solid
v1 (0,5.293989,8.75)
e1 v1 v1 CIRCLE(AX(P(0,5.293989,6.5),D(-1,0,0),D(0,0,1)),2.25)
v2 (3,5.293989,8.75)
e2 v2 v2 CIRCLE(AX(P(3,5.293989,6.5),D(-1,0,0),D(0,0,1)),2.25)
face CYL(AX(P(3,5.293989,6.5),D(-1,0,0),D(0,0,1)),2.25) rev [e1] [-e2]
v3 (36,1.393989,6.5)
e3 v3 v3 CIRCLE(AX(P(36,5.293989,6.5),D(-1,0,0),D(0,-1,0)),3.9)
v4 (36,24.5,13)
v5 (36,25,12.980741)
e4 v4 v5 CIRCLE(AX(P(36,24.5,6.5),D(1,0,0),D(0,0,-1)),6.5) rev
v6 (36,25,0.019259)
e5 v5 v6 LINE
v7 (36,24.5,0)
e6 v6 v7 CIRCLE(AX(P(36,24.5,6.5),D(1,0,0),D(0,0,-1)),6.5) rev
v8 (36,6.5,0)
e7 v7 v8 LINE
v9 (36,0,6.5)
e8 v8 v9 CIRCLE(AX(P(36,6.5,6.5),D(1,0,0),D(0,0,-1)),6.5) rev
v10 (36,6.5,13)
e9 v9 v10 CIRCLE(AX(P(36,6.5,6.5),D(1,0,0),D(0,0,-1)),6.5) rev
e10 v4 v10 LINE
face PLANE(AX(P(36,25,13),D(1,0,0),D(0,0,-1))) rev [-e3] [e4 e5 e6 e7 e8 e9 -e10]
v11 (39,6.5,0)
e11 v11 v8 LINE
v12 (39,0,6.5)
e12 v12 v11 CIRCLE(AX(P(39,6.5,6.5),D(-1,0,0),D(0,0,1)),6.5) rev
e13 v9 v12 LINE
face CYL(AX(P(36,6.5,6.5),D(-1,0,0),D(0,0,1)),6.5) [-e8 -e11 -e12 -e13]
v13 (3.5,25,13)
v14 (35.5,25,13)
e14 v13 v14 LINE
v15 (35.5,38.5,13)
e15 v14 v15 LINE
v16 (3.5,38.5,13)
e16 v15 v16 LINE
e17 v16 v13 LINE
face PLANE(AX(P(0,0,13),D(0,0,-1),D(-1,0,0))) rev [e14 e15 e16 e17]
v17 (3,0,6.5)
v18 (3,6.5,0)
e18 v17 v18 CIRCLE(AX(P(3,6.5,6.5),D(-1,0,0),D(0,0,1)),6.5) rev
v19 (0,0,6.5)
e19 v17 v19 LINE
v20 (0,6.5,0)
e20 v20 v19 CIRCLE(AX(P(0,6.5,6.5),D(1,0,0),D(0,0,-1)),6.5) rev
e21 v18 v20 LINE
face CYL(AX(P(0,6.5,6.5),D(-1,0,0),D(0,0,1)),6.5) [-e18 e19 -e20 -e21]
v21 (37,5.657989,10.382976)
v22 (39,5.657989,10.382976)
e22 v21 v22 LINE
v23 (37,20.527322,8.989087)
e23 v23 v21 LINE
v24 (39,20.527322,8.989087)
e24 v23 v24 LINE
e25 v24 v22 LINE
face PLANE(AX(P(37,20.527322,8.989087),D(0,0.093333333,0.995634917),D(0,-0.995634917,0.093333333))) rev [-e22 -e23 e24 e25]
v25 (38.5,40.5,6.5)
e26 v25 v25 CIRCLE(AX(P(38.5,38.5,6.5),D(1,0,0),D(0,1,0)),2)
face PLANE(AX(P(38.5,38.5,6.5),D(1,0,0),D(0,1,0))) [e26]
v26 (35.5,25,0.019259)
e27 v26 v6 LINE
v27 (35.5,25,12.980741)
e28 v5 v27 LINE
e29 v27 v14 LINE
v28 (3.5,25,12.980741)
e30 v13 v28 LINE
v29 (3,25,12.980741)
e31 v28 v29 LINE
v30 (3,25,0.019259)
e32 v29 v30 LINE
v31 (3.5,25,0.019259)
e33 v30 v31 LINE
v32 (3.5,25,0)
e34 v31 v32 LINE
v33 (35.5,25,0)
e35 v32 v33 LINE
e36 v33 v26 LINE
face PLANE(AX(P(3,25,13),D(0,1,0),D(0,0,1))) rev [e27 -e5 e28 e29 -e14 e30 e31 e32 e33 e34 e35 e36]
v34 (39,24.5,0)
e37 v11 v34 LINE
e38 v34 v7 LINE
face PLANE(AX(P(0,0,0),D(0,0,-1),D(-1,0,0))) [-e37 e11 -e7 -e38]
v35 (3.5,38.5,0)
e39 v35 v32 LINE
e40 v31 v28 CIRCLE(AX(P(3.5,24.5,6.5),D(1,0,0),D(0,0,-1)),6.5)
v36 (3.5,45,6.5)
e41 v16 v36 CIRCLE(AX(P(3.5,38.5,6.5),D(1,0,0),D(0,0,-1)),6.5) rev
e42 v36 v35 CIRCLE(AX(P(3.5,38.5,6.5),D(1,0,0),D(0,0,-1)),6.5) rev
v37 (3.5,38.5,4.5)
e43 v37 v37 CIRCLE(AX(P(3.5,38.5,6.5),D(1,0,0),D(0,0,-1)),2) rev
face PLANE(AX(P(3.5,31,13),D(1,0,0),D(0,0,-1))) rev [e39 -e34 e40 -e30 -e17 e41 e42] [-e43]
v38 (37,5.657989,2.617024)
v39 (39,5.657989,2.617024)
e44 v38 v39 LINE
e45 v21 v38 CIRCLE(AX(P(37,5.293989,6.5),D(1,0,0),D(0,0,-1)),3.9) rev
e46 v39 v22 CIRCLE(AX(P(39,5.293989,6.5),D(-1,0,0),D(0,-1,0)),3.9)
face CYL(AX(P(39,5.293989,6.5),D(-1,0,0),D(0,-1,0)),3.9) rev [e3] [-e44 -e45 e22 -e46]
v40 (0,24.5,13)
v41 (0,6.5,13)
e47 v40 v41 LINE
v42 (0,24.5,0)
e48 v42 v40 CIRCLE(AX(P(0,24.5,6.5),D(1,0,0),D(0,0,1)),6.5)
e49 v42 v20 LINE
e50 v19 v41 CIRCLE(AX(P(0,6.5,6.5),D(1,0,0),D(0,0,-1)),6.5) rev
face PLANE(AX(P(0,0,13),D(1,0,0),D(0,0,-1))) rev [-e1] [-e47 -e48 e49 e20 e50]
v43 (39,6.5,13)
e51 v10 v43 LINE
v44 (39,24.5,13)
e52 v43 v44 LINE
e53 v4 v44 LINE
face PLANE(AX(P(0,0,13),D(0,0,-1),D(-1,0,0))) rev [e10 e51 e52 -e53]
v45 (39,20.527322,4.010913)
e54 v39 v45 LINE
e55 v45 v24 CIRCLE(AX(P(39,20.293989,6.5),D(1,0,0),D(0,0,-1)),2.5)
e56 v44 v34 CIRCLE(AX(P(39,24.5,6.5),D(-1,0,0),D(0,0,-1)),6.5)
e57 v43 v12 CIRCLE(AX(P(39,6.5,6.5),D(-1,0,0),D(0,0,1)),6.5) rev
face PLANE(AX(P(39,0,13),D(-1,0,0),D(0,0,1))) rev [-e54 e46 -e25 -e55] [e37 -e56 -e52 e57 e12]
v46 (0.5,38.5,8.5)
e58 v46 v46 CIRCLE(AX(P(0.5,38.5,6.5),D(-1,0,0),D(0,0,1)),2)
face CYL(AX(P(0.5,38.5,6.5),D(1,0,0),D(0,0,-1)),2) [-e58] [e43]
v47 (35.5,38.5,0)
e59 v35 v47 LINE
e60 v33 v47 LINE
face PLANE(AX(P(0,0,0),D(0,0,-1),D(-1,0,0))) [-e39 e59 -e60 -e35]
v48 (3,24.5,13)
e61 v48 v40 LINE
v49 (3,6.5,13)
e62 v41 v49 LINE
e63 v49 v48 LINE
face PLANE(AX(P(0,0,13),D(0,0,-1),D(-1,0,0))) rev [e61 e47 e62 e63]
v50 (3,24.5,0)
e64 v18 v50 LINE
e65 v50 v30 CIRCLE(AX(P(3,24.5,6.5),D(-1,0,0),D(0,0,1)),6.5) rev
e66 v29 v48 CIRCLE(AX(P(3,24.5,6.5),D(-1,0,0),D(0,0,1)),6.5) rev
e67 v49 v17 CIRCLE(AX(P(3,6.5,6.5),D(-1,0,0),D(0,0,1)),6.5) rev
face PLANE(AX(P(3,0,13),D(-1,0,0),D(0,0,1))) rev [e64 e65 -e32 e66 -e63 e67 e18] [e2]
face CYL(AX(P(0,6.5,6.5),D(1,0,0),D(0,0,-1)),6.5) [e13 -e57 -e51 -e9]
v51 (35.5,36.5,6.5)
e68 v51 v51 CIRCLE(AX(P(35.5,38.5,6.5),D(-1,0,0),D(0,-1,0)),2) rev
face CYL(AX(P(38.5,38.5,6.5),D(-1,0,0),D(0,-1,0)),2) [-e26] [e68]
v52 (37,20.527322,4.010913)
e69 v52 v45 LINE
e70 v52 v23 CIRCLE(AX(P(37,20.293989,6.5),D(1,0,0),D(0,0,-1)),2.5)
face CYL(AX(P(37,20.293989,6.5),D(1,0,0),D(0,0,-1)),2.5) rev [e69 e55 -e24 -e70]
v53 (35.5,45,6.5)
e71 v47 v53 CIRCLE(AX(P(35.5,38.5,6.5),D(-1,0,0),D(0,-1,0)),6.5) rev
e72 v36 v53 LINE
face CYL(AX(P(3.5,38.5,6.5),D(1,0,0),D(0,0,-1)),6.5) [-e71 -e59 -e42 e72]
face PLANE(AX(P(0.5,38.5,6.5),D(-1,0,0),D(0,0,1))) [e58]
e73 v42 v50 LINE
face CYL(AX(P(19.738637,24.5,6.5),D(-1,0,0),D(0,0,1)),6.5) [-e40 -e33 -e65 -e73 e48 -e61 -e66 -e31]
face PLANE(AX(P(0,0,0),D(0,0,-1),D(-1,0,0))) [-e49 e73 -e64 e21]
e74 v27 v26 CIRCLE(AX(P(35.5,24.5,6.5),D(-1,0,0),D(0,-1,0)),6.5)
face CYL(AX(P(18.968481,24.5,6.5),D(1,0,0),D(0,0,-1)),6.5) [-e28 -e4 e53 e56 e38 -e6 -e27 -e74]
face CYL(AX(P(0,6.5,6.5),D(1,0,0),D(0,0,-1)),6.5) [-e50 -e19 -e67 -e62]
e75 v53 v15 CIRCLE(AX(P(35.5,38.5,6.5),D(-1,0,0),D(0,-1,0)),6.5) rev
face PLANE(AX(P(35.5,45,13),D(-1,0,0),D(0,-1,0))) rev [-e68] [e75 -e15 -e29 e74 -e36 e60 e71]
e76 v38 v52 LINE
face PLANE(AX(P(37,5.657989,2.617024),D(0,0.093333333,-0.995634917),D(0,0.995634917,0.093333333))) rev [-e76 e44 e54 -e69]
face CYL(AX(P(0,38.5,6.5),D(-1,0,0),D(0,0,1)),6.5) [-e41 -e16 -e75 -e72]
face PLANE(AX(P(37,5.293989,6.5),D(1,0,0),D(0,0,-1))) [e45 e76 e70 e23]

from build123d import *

# Parameters (mm, degrees)
BOSS_EXTRUDE1_DEPTH = 13
SKETCH2_R           = 2.25
CUT_EXTRUDE1_DEPTH  = 3
SKETCH3_R           = 2
BOSS_EXTRUDE3_DEPTH = 3
BOSS_EXTRUDE4_START = 3
SKETCH4_R           = 2
BOSS_EXTRUDE4_DEPTH = 3
CUT_EXTRUDE2_DEPTH  = 3.5
CUT_EXTRUDE3_START  = -3.5
CUT_EXTRUDE3_DEPTH  = 3.5
FILLET1_R           = 6.5
SKETCH7_R           = 3.9
CUT_EXTRUDE4_DEPTH  = 60.076221951
CUT_EXTRUDE5_START  = -2
CUT_EXTRUDE5_DEPTH  = 2


with BuildPart() as part:
    # Sketch1 → Boss-Extrude1 (new body)
    with BuildSketch(Plane.XY):
        Polygon((3, 0), (3, 25), (36, 25), (36, 0), (39, 0), (39, 31), (35.5, 31), (35.5, 45), (3.5, 45), (3.5, 31), (0, 31), (0, 0), align=None)
    extrude(amount=BOSS_EXTRUDE1_DEPTH)

    # Sketch2 → Cut-Extrude1 (cut)
    with BuildSketch(Plane.ZY):
        with Locations((6.5, 5.293988539)):
            Circle(SKETCH2_R)
    extrude(amount=-CUT_EXTRUDE1_DEPTH, mode=Mode.SUBTRACT)

    # Sketch3 → Boss-Extrude3 (add)
    with BuildSketch(Plane.ZY.offset(-3.5)):
        with Locations(Location((6.5, 38.5, 0), (0, 0, 180))):
            Circle(SKETCH3_R)
    extrude(amount=BOSS_EXTRUDE3_DEPTH)

    # Sketch4 → Boss-Extrude4 (add)
    with BuildSketch(Plane(origin=(35.5, 0, 0), x_dir=(0, 0, -1), z_dir=(1, 0, 0)).offset(BOSS_EXTRUDE4_START)):
        with Locations((-6.5, 38.5)):
            Circle(SKETCH4_R)
    extrude(amount=-BOSS_EXTRUDE4_DEPTH)

    # Sketch5 → Cut-Extrude2 (cut)
    with BuildSketch(Plane.ZY):
        with BuildLine():
            Line((0, 24.5), (0, 34.231050233))
            Line((0, 34.231050233), (13, 34.231050233))
            Line((13, 34.231050233), (13, 24.5))
            ThreePointArc((13, 24.5), (6.5, 31), (0, 24.5))
        make_face()
    extrude(amount=-CUT_EXTRUDE2_DEPTH, mode=Mode.SUBTRACT)

    # Sketch6 → Cut-Extrude3 (cut)
    with BuildSketch(Plane(origin=(39, 0, 0), x_dir=(0, 0, -1), z_dir=(1, 0, 0)).offset(CUT_EXTRUDE3_START)):
        with BuildLine():
            Line((-13, 24.5), (-13, 34.712302794))
            Line((-13, 34.712302794), (0, 34.712302794))
            Line((0, 34.712302794), (0, 24.5))
            ThreePointArc((0, 24.5), (-6.5, 31), (-13, 24.5))
        make_face()
    extrude(amount=CUT_EXTRUDE3_DEPTH, mode=Mode.SUBTRACT)

    # Fillet1
    fillet1_edges = [part.edges().sort_by_distance(p)[0] for p in [
        (37.5, 0, 13),
        (37.5, 0, 0),
        (1.5, 0, 0),
        (1.5, 0, 13),
        (19.5, 45, 0),
        (19.5, 45, 13),
    ]]
    fillet(fillet1_edges, radius=FILLET1_R - 0.0001)  # a hair under: the kernel refuses the full size

    # Sketch7 → Cut-Extrude4 (cut, through all)
    with BuildSketch(Plane.ZY.offset(-36)):
        with Locations(Location((6.5, 5.293988539, 0), (0, 0, 270))):
            Circle(SKETCH7_R)
    extrude(amount=-CUT_EXTRUDE4_DEPTH, mode=Mode.SUBTRACT)

    # Sketch8 → Cut-Extrude5 (cut)
    with BuildSketch(Plane(origin=(39, 0, 0), x_dir=(0, 0, -1), z_dir=(1, 0, 0)).offset(CUT_EXTRUDE5_START)):
        with BuildLine():
            Line((-2.617023822, 5.657988539), (-4.010912706, 20.527321872))
            ThreePointArc((-4.010912706, 20.527321872), (-6.5, 22.793988539), (-8.989087294, 20.527321872))
            Line((-8.989087294, 20.527321872), (-10.382976178, 5.657988539))
            ThreePointArc((-10.382976178, 5.657988539), (-6.5, 1.393988539), (-2.617023822, 5.657988539))
        make_face()
    extrude(amount=CUT_EXTRUDE5_DEPTH, mode=Mode.SUBTRACT)


solid = part.part
